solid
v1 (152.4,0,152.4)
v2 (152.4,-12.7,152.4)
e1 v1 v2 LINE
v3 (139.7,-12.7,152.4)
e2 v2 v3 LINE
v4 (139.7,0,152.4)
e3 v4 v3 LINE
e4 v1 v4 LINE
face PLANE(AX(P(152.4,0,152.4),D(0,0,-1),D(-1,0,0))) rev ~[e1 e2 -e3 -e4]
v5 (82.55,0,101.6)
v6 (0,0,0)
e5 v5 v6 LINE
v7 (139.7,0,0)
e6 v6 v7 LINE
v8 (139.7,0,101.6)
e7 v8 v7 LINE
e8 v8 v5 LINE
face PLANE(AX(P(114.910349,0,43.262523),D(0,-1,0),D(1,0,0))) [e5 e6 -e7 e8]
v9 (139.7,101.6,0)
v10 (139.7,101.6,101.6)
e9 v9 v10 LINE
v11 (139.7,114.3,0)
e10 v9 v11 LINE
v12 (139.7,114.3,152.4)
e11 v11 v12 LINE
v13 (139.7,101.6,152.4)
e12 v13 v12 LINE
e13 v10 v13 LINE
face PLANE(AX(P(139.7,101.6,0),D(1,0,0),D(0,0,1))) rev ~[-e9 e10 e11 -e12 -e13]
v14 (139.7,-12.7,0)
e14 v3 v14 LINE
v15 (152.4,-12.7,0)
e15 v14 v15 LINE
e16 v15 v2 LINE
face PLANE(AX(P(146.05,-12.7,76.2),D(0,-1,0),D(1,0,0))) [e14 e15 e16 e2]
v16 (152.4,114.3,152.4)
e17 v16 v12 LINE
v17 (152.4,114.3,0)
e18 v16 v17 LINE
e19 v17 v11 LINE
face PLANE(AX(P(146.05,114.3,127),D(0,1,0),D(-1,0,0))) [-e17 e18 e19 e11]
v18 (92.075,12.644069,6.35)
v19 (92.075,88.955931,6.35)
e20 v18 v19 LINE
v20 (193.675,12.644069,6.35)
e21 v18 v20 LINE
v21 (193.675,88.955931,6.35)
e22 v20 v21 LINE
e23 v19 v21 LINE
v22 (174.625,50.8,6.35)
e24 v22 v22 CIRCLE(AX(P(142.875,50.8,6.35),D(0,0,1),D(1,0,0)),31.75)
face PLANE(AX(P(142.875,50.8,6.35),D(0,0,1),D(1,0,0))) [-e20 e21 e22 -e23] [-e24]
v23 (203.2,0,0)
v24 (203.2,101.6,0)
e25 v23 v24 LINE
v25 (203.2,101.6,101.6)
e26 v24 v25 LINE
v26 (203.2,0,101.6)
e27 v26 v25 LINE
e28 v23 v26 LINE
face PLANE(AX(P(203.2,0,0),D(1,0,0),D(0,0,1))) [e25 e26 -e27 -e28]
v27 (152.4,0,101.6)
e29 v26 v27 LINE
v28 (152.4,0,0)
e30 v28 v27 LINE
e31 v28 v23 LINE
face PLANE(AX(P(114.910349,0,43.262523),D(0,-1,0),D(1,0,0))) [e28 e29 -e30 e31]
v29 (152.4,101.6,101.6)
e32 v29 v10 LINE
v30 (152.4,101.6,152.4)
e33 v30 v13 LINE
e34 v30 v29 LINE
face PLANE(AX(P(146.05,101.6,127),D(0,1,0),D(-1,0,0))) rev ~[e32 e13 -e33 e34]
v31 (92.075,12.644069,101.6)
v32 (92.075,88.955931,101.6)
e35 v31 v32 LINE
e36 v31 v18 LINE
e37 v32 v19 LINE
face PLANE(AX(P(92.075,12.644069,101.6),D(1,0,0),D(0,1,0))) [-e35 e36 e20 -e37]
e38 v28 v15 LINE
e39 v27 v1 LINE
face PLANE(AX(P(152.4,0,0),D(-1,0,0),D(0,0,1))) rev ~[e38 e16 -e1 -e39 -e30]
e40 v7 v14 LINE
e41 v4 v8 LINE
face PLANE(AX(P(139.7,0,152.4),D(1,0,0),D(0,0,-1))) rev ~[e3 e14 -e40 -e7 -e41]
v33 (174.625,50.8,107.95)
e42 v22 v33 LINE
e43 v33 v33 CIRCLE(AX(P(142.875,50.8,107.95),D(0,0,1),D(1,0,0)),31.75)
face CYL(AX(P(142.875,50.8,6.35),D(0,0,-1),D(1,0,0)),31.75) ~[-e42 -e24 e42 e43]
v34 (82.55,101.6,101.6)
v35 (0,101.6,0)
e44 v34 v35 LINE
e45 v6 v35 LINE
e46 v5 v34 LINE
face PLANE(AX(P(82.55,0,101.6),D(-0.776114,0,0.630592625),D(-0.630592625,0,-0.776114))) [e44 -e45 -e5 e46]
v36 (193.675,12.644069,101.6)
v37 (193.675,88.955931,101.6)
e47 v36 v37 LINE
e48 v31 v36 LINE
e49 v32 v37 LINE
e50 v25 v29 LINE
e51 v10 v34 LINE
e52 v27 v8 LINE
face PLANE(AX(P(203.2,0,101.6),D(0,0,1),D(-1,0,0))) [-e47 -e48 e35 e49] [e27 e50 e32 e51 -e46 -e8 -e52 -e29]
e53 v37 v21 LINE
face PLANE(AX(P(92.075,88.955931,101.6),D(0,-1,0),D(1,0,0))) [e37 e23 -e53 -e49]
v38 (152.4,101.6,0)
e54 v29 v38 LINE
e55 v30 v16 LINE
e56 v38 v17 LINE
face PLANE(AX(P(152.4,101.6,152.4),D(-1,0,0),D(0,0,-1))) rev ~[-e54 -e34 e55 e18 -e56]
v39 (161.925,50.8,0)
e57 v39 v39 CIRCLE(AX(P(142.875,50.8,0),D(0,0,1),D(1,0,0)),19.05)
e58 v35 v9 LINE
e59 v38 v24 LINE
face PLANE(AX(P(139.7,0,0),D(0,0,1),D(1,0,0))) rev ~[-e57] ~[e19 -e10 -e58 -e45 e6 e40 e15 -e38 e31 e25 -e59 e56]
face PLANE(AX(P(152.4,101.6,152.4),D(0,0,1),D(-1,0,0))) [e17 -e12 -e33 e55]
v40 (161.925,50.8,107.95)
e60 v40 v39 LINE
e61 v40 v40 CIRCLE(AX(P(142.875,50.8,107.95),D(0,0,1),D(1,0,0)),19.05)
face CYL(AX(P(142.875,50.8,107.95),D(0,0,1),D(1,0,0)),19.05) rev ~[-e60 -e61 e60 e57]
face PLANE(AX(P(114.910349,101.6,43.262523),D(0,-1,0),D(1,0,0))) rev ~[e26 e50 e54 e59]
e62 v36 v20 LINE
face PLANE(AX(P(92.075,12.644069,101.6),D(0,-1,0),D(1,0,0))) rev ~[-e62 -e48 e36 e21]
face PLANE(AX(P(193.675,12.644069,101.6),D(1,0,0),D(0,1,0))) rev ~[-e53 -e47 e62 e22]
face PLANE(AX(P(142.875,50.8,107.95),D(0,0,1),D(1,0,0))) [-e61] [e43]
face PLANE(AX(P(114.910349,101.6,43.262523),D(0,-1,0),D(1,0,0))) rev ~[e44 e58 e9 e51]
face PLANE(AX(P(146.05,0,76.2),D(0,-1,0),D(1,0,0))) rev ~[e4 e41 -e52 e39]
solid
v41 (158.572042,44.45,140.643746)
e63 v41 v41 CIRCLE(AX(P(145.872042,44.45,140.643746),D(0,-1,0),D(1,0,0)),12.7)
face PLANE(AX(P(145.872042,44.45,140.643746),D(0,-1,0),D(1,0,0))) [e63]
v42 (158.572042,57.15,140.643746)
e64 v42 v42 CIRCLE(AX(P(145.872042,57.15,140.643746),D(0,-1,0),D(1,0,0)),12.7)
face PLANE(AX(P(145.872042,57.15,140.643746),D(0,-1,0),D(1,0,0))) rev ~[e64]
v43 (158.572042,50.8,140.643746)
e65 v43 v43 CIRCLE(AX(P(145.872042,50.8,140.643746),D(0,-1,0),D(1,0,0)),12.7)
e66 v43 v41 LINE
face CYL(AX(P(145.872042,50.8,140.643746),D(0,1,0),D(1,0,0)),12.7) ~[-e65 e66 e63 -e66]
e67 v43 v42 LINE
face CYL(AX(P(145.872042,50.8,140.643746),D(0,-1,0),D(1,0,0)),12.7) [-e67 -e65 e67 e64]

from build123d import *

# Parameters (mm, degrees)
F1_DEPTH  = 101.6
F2_W      = 101.6
F2_H      = 76.311862731
F3_DEPTH  = 95.25
F4_R      = 31.75
F5_DEPTH  = 101.6
F6_R      = 19.05
F7_DEPTH  = 159.004
F9_W      = 12.7
F9_H      = 50.8
F9_H_2    = 101.6
F10_DEPTH = 12.7
F12_DEPTH = 12.7
F17_R     = 12.7
F18_DEPTH = 6.35
F19_DEPTH = 6.35


# Not quite as in the source:
# - the program builds the solid bodies; features that only make, move or delete a surface that nothing else refers to are left out


with BuildPart() as f1:
    # F0 (on Front) → F1 (new body)
    with BuildSketch(Plane.XZ):
        Polygon((82.55, 101.6), (0, 0), (203.2, 0), (203.2, 101.6), align=None)
    extrude(amount=-F1_DEPTH)

    # F2 (on face) → F3 (cut)
    with BuildSketch(Plane.XY.offset(101.6)):
        with Locations((142.875, 50.8)):
            Rectangle(F2_W, F2_H)
    extrude(amount=-F3_DEPTH, mode=Mode.SUBTRACT)

    # F4 (on face) → F5 (join)
    with BuildSketch(Plane.XY.offset(6.35)):
        with Locations((142.875, 50.8)):
            Circle(F4_R)
    extrude(amount=F5_DEPTH)

    # F6 (on face) → F7 (cut)
    with BuildSketch(Plane.XY.offset(107.95)):
        with Locations((142.875, 50.8)):
            Circle(F6_R)
    extrude(amount=-F7_DEPTH, mode=Mode.SUBTRACT)

    # F9 (on face) → F10 (join)
    with BuildSketch(Plane(origin=(0, 101.6, 0), x_dir=(-1, 0, 0), z_dir=(0, 1, 0))):
        with Locations((-146.05, 127)):
            Rectangle(F9_W, F9_H)
        with Locations((-146.05, 50.8)):
            Rectangle(F9_W, F9_H_2)
    extrude(amount=F10_DEPTH)

    # F11 (on face) → F12 (join)
    with BuildSketch(Plane.XZ):
        Polygon((139.7, 0), (152.4, 0), (152.4, 101.6), (152.4, 152.4), (139.7, 152.4), (139.7, 101.6), align=None)
    extrude(amount=F12_DEPTH)


with BuildPart() as f18:
    # F17 (on offset) → F18 (new body)
    with BuildSketch(Plane.XZ.offset(-50.8)):
        with Locations((145.8720415831, 140.6437456608)):
            Circle(F17_R)
    extrude(amount=-F18_DEPTH)

    # F19 (add): a face of the model
    f19_faces = [f18.faces().sort_by_distance(p)[0] for p in [
        (145.8720415831, 50.8, 140.6437456608),
    ]]
    extrude(f19_faces, amount=F19_DEPTH)


solid = Compound([f1.part, f18.part])
